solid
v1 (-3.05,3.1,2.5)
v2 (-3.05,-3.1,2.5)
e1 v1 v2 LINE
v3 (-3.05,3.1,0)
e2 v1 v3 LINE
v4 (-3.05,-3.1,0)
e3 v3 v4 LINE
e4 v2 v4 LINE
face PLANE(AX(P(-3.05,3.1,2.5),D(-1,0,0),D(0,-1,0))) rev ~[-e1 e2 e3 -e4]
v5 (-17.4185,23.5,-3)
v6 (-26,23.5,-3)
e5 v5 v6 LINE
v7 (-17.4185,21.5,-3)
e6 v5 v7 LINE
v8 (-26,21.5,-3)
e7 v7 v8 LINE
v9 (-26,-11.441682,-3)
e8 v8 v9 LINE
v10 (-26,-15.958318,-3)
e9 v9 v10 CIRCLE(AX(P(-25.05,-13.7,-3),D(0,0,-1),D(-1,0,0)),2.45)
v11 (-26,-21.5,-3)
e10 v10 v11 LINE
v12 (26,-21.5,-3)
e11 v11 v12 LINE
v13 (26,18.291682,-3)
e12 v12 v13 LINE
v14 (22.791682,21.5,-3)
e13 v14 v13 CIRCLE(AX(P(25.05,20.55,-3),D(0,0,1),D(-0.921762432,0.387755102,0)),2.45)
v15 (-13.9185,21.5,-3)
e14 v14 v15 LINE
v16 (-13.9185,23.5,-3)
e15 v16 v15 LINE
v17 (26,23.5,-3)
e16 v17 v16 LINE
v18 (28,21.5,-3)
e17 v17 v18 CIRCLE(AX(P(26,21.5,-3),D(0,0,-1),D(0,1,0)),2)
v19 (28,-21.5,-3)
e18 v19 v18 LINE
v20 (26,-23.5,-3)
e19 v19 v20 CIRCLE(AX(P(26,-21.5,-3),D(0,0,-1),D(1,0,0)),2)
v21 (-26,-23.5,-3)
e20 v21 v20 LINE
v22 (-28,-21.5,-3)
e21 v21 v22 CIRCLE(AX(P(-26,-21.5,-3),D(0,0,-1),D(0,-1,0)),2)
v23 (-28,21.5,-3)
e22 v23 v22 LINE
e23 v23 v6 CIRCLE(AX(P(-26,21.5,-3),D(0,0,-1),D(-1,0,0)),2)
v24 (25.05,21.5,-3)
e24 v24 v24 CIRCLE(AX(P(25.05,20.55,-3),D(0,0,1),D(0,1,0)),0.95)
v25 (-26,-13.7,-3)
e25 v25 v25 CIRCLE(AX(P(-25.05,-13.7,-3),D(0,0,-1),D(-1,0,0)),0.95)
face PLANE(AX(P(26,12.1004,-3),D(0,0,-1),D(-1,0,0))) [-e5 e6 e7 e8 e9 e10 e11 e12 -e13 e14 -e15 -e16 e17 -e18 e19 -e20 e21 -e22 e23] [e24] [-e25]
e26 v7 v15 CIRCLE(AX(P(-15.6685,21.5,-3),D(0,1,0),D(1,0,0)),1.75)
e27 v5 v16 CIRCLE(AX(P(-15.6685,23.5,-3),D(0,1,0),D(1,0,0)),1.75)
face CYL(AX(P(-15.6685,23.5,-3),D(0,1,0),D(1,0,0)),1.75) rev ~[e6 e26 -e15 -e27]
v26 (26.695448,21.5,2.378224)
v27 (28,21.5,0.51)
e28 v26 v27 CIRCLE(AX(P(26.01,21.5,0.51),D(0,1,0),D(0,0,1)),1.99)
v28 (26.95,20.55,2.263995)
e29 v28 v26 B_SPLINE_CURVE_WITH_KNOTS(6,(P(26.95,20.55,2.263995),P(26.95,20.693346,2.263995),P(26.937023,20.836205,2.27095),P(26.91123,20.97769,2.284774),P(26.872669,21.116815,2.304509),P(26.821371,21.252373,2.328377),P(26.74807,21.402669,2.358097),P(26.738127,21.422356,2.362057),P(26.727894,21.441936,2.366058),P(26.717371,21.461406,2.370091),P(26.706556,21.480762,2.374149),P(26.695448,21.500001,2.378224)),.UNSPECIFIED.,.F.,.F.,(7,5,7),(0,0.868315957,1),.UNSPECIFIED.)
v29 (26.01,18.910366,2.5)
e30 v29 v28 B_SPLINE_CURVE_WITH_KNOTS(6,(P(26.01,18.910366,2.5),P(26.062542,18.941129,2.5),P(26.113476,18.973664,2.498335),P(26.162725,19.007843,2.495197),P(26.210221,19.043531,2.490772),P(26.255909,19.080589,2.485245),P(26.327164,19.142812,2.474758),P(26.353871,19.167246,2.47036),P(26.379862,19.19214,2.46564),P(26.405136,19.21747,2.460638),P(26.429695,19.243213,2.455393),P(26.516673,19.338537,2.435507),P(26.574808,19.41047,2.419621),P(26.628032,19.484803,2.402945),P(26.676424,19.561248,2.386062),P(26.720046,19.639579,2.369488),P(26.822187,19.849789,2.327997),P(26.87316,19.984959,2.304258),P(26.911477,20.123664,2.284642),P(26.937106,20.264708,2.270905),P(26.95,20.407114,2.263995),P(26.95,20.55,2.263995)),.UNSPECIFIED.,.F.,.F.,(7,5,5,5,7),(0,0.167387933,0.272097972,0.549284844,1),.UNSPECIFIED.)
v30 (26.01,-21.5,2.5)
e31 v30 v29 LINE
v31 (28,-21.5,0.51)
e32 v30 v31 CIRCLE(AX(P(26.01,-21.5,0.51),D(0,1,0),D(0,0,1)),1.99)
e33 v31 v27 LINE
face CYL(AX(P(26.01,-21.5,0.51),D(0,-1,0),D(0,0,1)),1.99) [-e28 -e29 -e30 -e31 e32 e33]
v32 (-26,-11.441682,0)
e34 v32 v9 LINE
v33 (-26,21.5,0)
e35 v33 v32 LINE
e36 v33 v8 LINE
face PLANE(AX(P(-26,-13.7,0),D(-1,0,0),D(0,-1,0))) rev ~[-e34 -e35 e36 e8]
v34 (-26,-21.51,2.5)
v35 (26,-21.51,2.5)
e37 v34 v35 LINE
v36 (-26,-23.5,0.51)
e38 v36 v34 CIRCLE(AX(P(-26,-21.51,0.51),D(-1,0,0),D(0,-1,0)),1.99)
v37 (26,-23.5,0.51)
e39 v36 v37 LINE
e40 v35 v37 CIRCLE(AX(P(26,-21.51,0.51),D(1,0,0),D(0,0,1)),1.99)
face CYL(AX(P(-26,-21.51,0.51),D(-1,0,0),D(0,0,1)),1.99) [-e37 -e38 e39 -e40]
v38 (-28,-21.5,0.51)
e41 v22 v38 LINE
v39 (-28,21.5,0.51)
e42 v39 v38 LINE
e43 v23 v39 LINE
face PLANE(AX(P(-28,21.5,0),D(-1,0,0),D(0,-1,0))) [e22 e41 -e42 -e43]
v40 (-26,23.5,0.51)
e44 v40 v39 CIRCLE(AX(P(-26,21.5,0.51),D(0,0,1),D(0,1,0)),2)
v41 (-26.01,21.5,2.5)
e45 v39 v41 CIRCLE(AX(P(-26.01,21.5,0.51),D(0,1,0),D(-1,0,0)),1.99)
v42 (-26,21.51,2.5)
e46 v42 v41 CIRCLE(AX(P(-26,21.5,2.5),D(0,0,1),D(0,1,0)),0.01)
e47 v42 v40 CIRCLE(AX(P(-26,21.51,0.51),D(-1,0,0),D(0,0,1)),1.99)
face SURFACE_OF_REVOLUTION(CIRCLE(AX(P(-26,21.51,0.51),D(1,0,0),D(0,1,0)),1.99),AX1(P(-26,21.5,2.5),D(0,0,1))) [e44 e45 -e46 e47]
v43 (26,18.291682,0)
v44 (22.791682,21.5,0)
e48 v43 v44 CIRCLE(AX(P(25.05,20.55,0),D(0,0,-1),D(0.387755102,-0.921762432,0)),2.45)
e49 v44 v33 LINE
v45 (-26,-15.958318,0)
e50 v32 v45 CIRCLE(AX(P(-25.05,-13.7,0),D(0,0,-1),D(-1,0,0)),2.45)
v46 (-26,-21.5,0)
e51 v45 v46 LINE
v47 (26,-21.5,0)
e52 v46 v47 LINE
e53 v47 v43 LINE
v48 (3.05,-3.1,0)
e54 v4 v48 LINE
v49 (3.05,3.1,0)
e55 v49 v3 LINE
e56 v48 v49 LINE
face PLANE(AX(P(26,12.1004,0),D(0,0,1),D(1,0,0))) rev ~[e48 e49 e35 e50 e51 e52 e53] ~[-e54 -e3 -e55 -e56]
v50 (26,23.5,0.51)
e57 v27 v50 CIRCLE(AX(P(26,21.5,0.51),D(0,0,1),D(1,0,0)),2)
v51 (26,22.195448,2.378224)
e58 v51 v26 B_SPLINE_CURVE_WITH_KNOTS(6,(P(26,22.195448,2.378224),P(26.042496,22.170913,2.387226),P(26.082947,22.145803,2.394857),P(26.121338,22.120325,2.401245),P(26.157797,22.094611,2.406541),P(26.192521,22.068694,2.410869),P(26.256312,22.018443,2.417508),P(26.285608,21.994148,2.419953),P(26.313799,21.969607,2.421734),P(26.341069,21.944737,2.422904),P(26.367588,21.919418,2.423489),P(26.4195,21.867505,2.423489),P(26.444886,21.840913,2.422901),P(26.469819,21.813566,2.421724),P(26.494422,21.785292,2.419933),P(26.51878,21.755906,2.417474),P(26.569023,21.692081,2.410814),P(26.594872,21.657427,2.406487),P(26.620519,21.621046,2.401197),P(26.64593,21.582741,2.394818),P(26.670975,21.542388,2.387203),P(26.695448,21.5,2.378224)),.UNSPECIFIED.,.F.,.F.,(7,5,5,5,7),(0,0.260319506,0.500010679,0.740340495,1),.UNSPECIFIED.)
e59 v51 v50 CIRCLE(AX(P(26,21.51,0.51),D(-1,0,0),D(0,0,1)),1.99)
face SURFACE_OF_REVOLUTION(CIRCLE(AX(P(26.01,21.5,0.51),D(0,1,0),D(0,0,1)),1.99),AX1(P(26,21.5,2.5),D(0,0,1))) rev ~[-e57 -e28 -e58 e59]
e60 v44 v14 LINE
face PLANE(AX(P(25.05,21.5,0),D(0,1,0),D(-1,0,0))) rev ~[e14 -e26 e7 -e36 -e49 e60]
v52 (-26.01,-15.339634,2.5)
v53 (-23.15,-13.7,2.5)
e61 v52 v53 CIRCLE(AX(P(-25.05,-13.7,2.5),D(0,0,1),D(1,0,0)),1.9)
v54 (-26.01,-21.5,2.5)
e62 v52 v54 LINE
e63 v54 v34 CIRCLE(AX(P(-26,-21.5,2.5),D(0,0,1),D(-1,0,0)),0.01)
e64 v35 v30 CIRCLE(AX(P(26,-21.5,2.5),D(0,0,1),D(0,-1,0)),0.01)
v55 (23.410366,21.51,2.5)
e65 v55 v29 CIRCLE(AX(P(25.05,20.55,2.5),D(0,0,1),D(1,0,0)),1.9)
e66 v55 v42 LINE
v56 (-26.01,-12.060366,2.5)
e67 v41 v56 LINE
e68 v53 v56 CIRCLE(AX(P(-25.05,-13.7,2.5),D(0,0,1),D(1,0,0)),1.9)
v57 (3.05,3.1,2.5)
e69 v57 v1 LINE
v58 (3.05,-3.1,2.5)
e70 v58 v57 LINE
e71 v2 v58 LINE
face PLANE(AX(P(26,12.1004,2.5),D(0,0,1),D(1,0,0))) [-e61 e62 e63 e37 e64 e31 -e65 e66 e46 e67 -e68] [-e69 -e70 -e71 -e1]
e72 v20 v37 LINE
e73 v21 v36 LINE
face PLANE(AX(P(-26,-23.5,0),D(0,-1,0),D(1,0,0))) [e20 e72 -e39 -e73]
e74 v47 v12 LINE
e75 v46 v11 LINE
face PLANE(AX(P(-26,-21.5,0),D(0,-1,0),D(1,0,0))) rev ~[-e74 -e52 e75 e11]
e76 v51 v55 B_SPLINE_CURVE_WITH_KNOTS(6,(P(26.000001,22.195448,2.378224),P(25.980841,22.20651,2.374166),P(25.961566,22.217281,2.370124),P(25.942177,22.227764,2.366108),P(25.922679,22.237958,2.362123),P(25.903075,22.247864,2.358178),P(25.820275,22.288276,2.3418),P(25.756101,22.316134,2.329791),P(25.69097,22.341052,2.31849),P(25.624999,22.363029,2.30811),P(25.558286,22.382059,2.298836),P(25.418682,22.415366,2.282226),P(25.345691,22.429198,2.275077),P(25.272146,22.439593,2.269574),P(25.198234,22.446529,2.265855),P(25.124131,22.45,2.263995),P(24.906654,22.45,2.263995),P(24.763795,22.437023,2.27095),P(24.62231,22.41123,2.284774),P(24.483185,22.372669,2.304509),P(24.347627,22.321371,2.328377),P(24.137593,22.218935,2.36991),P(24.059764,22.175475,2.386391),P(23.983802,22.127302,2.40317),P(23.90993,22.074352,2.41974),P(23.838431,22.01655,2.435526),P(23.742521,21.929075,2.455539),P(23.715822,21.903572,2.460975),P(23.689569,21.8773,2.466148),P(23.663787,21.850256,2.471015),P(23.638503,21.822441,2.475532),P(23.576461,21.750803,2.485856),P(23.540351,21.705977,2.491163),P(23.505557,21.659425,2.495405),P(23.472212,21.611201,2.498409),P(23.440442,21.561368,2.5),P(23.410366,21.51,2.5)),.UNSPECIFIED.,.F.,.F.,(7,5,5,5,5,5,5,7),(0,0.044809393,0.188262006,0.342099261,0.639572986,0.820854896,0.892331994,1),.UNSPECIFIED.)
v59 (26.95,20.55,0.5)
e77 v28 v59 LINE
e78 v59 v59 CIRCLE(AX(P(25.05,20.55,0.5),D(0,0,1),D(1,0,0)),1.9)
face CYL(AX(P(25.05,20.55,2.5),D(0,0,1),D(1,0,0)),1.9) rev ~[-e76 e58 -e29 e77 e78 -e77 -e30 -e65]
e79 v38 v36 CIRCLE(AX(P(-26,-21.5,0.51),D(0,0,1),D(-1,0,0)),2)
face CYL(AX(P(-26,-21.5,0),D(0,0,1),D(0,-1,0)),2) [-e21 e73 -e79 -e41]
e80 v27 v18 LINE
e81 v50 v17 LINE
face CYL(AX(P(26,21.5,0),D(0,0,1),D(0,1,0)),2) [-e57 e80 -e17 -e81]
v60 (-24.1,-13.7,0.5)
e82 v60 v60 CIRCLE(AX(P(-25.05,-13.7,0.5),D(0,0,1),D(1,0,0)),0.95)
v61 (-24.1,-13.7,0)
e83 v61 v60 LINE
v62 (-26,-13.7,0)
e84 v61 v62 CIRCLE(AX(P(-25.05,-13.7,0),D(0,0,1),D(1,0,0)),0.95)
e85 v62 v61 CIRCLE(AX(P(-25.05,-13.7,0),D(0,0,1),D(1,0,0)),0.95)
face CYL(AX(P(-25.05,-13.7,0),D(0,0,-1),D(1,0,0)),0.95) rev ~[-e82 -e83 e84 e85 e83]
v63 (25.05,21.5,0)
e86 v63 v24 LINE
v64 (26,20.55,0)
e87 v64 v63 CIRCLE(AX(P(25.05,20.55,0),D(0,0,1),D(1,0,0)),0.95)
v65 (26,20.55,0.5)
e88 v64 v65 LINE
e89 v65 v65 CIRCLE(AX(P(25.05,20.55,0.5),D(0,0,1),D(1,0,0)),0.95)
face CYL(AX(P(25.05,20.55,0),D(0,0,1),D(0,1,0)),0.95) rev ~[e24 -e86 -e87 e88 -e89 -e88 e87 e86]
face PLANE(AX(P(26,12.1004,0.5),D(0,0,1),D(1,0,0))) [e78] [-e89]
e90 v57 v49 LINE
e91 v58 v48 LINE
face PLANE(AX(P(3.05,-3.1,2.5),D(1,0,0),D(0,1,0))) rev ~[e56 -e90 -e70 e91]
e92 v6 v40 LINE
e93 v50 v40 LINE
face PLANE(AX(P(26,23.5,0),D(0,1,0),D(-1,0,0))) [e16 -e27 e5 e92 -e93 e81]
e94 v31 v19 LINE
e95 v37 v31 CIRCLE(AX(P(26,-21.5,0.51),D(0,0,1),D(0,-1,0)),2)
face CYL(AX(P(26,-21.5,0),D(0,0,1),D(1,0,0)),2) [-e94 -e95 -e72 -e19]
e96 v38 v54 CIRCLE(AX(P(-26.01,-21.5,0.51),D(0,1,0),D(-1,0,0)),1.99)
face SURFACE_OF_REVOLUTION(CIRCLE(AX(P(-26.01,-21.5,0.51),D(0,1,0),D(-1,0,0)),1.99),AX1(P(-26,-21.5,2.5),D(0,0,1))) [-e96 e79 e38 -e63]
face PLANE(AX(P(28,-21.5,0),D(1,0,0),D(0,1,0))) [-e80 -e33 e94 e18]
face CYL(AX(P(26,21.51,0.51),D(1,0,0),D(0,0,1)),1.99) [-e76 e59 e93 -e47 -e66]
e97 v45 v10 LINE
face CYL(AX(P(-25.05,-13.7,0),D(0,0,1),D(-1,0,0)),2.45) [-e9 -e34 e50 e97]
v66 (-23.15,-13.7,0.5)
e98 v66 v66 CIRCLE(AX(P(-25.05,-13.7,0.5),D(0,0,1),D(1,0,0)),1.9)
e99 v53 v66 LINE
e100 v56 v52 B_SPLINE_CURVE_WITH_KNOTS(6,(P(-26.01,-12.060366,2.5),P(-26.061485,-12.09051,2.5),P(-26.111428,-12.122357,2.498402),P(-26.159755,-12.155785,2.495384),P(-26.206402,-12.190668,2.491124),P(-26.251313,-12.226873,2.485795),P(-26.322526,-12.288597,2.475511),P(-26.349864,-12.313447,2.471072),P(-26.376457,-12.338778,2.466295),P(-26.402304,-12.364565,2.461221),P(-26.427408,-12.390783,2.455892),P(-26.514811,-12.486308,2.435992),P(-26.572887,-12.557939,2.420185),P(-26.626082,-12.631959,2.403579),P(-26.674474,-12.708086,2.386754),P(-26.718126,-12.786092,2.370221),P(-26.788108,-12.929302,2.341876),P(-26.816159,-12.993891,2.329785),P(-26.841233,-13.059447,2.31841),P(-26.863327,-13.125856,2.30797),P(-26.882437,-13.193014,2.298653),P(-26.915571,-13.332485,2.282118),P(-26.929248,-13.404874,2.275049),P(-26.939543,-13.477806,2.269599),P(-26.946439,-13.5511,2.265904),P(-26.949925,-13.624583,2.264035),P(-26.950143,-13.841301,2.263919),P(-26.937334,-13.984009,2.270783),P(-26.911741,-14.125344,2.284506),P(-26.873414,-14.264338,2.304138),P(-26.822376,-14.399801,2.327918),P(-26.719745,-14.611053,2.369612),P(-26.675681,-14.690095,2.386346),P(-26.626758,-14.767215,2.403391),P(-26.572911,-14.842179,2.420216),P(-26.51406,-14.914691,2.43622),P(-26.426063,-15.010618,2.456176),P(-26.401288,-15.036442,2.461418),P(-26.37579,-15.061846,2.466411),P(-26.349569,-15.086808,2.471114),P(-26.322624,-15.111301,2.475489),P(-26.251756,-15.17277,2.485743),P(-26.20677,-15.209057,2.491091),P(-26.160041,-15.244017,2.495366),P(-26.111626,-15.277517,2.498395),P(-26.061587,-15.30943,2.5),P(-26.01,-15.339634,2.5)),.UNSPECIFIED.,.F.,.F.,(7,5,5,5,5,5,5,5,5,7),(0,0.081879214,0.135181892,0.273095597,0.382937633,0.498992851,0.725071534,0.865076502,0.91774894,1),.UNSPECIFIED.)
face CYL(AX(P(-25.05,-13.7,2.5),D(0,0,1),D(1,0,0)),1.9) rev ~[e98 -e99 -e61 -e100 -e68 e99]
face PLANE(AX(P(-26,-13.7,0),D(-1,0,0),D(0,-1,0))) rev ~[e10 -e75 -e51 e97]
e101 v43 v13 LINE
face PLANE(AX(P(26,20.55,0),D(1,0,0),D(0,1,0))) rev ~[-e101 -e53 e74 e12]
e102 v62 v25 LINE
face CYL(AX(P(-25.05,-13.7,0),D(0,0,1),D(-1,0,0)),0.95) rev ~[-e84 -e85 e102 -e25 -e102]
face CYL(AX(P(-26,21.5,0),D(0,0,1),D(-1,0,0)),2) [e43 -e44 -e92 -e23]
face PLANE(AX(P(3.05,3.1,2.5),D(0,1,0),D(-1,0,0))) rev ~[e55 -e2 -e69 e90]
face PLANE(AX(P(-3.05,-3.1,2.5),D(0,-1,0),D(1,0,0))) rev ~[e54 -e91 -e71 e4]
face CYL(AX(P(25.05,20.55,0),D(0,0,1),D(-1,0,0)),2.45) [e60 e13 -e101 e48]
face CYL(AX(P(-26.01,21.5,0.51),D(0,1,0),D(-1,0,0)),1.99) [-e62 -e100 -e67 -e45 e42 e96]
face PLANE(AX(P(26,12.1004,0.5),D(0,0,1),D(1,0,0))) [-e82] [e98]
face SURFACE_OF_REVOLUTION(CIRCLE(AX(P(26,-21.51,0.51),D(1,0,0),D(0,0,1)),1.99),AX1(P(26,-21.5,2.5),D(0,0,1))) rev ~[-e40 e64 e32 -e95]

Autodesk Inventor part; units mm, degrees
ref_plane "YZ Plane" through (0, 0, 0) normal (1, 0, 0) x (0, 1, 0)
ref_plane "XZ Plane" through (0, 0, 0) normal (0, 1, 0) x (-1, 0, 0)
ref_plane "Arbeitsebene1" through (26, 12.1004, 0) normal (0, 0, 1) x (1, 0, 0)
sketch "Skizze1" plane through (26, 12.1004, 0) normal (0, 0, 1) x (1, 0, 0)
  arc A0 (-54, -33.6004) -> (-52, -35.6004) centre (-52, -33.6004) ccw projected
  line L0 (-52, -35.6004) -> (0, -35.6004) projected
  arc A1 (0, -35.6004) -> (2, -33.6004) centre (0, -33.6004) ccw projected
  line L1 (2, -33.6004) -> (2, 9.3996) projected
  arc A2 (2, 9.3996) -> (0, 11.3996) centre (0, 9.3996) ccw projected
  line L2 (0, 11.3996) -> (-52, 11.3996) projected
  arc A3 (-52, 11.3996) -> (-54, 9.3996) centre (-52, 9.3996) ccw projected
  line L3 (-54, 9.3996) -> (-54, -33.6004) projected
  circle A4 centre (-0.95, 8.4496) radius 0.95 projected
  circle A5 centre (-51.05, -25.8004) radius 0.95 projected
  arc A6 (-24.2441, 3.8663) -> (-23.5, 4.8331) centre (-24.5, 4.8331) ccw projected
  line L4 (-23.5, 5.8996) -> (-23.5, 4.8331) projected
  line L5 (-24.5, 5.8996) -> (-23.5, 5.8996) projected
  line L6 (-24.5, 9.3996) -> (-24.5, 5.8996) projected
  line L7 (-24.5, 9.3996) -> (-7.5, 9.3996) projected
  line L8 (-7.5, 5.8996) -> (-7.5, 9.3996) projected
  line L9 (-8.5, 5.8996) -> (-7.5, 5.8996) projected
  line L10 (-8.5, 4.8996) -> (-8.5, 5.8996) projected
  arc A7 (-8.5, 4.8996) -> (-7.5, 3.8996) centre (-7.5, 4.8996) ccw projected
  line L11 (-7, 3.8996) -> (-7.5, 3.8996) projected
  arc A8 (-7, 3.8996) -> (-6, 4.8996) centre (-7, 4.8996) ccw projected
  line L12 (-6, 9.3996) -> (-6, 4.8996) projected
  line L13 (-6, 9.3996) -> (-4.3996, 9.3996) projected
  arc A9 (-3.3997, 8.4141) -> (-4.3996, 9.3996) centre (-4.3996, 8.3996) ccw projected
  arc A10 (-3.3997, 8.4141) -> (-0.9855, 5.9999) centre (-0.95, 8.4496) ccw projected
  arc A11 (0, 5) -> (-0.9855, 5.9999) centre (-1, 5) ccw projected
  line L14 (0, 5) -> (0, -25.7504) projected
  arc A12 (-0.5, -26.6164) -> (0, -25.7504) centre (-1, -25.7504) ccw projected
  arc A13 (-0.5, -26.6164) -> (-1, -27.4824) centre (0, -27.4824) ccw projected
  line L15 (-1, -28.7504) -> (-1, -27.4824) projected
  line L16 (0, -28.7504) -> (-1, -28.7504) projected
  line L17 (0, -28.7504) -> (0, -33.6004) projected
  line L18 (0, -33.6004) -> (-52, -33.6004) projected
  line L19 (-52, -33.6004) -> (-52, -28.7504) projected
  line L20 (-51, -28.7504) -> (-52, -28.7504) projected
  line L21 (-51, -28.6986) -> (-51, -28.7504) projected
  arc A14 (-50.5932, -28.2074) -> (-51, -28.6986) centre (-50.5, -28.6986) ccw projected
  arc A15 (-50.5932, -28.2074) -> (-51.0145, -23.3506) centre (-51.05, -25.8004) ccw projected
  arc A16 (-52, -22.3507) -> (-51.0145, -23.3506) centre (-51, -22.3507) ccw projected
  line L22 (-52, -22.3507) -> (-52, 2.2996) projected
  arc A17 (-51.5, 3.1657) -> (-52, 2.2996) centre (-51, 2.2996) ccw projected
  arc A18 (-51.5, 3.1657) -> (-51, 4.0317) centre (-52, 4.0317) ccw projected
  line L23 (-51, 5.2996) -> (-51, 4.0317) projected
  line L24 (-52, 5.2996) -> (-51, 5.2996) projected
  line L25 (-52, 5.2996) -> (-52, 9.3996) projected
  line L26 (-52, 9.3996) -> (-26, 9.3996) projected
  line L27 (-26, 5.2996) -> (-26, 9.3996) projected
  line L28 (-27, 5.2996) -> (-26, 5.2996) projected
  line L29 (-27, 4.2996) -> (-27, 5.2996) projected
  arc A19 (-27, 4.2996) -> (-26, 3.2996) centre (-26, 4.2996) ccw projected
  line L30 (-25.4165, 3.2996) -> (-26, 3.2996) projected
  arc A20 (-25.4165, 3.2996) -> (-24.7024, 3.5996) centre (-25.4165, 4.2996) ccw projected
  arc A21 (-24.2441, 3.8663) -> (-24.7024, 3.5996) centre (-23.9882, 2.8996) ccw projected
  point P0 (-26, -12.1004)
extrude "Extrusion1" add sketch "Skizze1" along normal blind 2.5 contours L3 A3 L2 A2 L1 A1 L0 A0 | A6 L4 L5 L6 L7 L8 L9 L10 A7 L11 A8 L12 L13 A9 A10 A11 L14 A12 A13 L15 L16 L17 L18 L19 L20 L21 A14 A15 A16 L22 A17 A18 L23 L24 L25 L26 L27 L28 L29 A19 L30 A20 A21
sketch "Skizze2" plane through (26, 12.1004, 2.5) normal (0, 0, 1) x (1, 0, 0)
  circle A0 centre (-0.95, 8.4496) radius 0.95 projected
  circle A1 centre (-51.05, -25.8004) radius 0.95 projected
  circle A2 centre (-51.05, -25.8004) radius 1.9
  circle A3 centre (-0.95, 8.4496) radius 1.9
  point P0 (-26, -12.1004)
  dimension "d2" = 3.8
  dimension "d3" = 3.8
extrude "Extrusion2" cut sketch "Skizze2" against normal blind 2
fillet "Rundung1" radius 1.99 8 edges at (27.4142, 22.9142, 2.5) (0, 23.5, 2.5) (-27.4142, 22.9142, 2.5) (-28, 0, 2.5) (-27.4142, -22.9142, 2.5) (0, -23.5, 2.5) (27.4142, -22.9142, 2.5) (28, 0, 2.5)
sketch "Skizze3" plane through (26, 12.1004, 2.5) normal (0, 0, 1) x (1, 0, 0)
  line L0 (-22.95, -9.0004) -> (-29.05, -9.0004)
  line L1 (-29.05, -9.0004) -> (-29.05, -15.2004)
  line L2 (-29.05, -15.2004) -> (-22.95, -15.2004)
  line L3 (-22.95, -15.2004) -> (-22.95, -9.0004)
  line L4 (-22.95, -9.0004) -> (-29.05, -15.2004) construction
  line L5 (-29.05, -9.0004) -> (-22.95, -15.2004) construction
  point P0 (-26, -12.1004)
  dimension "d7" = 6.1
  dimension "d8" = 6.2
extrude "Extrusion3" cut sketch "Skizze3" against normal through all
sketch "Skizze5" plane through (26, 12.1004, 0) normal (0, 0, -1) x (-1, 0, 0)
  line L0 (0, 9.3996) -> (52, 9.3996)
  line L1 (52, 9.3996) -> (52, -33.6004)
  line L2 (52, -33.6004) -> (0, -33.6004)
  line L3 (0, -33.6004) -> (0, 9.3996)
  line L4 (0, 11.3996) -> (52, 11.3996) projected
  line L5 (52, -35.6004) -> (0, -35.6004) projected
  line L6 (54, 9.3996) -> (54, -33.6004) projected
  line L7 (-2, -33.6004) -> (-2, 9.3996) projected
  line L8 (29.05, -15.2004) -> (22.95, -15.2004) projected
  line L9 (22.95, -15.2004) -> (22.95, -9.0004) projected
  line L10 (22.95, -9.0004) -> (29.05, -9.0004) projected
  line L11 (29.05, -9.0004) -> (29.05, -15.2004) projected
  line L12 (52, -35.6004) -> (0, -35.6004) projected
  arc A0 (52, -35.6004) -> (54, -33.6004) centre (52, -33.6004) ccw projected
  line L13 (54, 9.3996) -> (54, -33.6004) projected
  arc A1 (54, 9.3996) -> (52, 11.3996) centre (52, 9.3996) ccw projected
  line L14 (0, 11.3996) -> (52, 11.3996) projected
  arc A2 (0, 11.3996) -> (-2, 9.3996) centre (0, 9.3996) ccw projected
  line L15 (-2, -33.6004) -> (-2, 9.3996) projected
  arc A3 (-2, -33.6004) -> (0, -35.6004) centre (0, -33.6004) ccw projected
  circle A4 centre (0.95, 8.4496) radius 0.95 projected
  circle A5 centre (51.05, -25.8004) radius 0.95 projected
  point P0 (26, -12.1004)
  point P1 (54, -33.6004)
  point P2 (54, 9.3996)
  point P3 (52, 11.3996)
  point P4 (0, 11.3996)
  point P5 (-2, 9.3996)
  point P6 (-2, -33.6004)
  point P7 (0, -35.6004)
  dimension "d11" = 2
  dimension "d12" = 2
  dimension "d13" = 2
  dimension "d14" = 2
extrude "Extrusion4" add sketch "Skizze5" along normal blind 3 contours L4 A1 L6 A0 L5 A3 L7 A2
sketch "Skizze6" plane through (-26, 23.5, 0.51) normal (0, 1, 0) x (1, 0, 0)
  line L0 (52, 3.51) -> (0, 3.51) projected
  circle A0 centre (10.3315, 3.51) radius 1.75
  point P0 (26, 0.51)
  point P1 (8.5815, 3.51)
  point P2 (12.0815, 3.51)
  dimension "d17" = 3.5
extrude "Extrusion5" cut sketch "Skizze6" against normal blind 3 contours A0 L0 picked at (10.0001, 3.0299)
sketch "Skizze7" plane through (26, 12.1004, 0) normal (0, 0, -1) x (-1, 0, 0)
  line L0 (29.05, -15.2004) -> (22.95, -15.2004) projected
  line L1 (22.95, -15.2004) -> (22.95, -9.0004) projected
  line L2 (22.95, -9.0004) -> (29.05, -9.0004) projected
  line L3 (29.05, -9.0004) -> (29.05, -15.2004) projected
  line L4 (52, 9.3996) -> (0.95, 9.3996) projected
  arc A0 (0, 8.4496) -> (0.95, 9.3996) centre (0.95, 8.4496) ccw projected
  line L5 (0, 8.4496) -> (0, -33.6004) projected
  line L6 (0, -33.6004) -> (52, -33.6004) projected
  line L7 (52, -33.6004) -> (52, -25.8004) projected
  circle A1 centre (51.05, -25.8004) radius 0.95 projected
  line L8 (52, -25.8004) -> (52, 9.3996) projected
  circle A2 centre (51.05, -25.8004) radius 2.45
  circle A3 centre (0.95, 8.4496) radius 2.45
  line L9 (39.9185, 9.3996) -> (39.9185, 11.3996) projected
  line L10 (39.9185, 11.3996) -> (0, 11.3996) projected
  arc A4 (0, 11.3996) -> (-2, 9.3996) centre (0, 9.3996) ccw projected
  line L11 (-2, 9.3996) -> (-2, -33.6004) projected
  arc A5 (-2, -33.6004) -> (0, -35.6004) centre (0, -33.6004) ccw projected
  line L12 (0, -35.6004) -> (52, -35.6004) projected
  arc A6 (52, -35.6004) -> (54, -33.6004) centre (52, -33.6004) ccw projected
  line L13 (54, -33.6004) -> (54, 9.3996) projected
  arc A7 (54, 9.3996) -> (52, 11.3996) centre (52, 9.3996) ccw projected
  line L14 (52, 11.3996) -> (43.4185, 11.3996) projected
  line L15 (43.4185, 11.3996) -> (43.4185, 9.3996) projected
  line L16 (43.4185, 9.3996) -> (52, 9.3996) projected
  line L17 (52, 9.3996) -> (52, -33.6004) projected
  line L18 (52, -33.6004) -> (0, -33.6004) projected
  line L19 (0, -33.6004) -> (0, 9.3996) projected
  line L20 (0, 9.3996) -> (39.9185, 9.3996) projected
  arc A8 (0.95, 9.3996) -> (0, 8.4496) centre (0.95, 8.4496) ccw projected
  point P0 (26, -12.1004)
  point P1 (52, -23.542)
  point P2 (52, -28.0587)
  point P3 (0.95, 9.3996)
  point P4 (0.95, 9.3996)
  point P5 (0.95, 9.3996)
  point P6 (3.2083, 9.3996)
  point P7 (0, 6.1913)
  dimension "d20" = 1.5
  dimension "d21" = 1.5
extrude "Extrusion6" add sketch "Skizze7" along normal blind 3 contours L8 L7 A2 | A3 L5 A0 L4 | A8 L19 L20 picked at (49.1338, -25.5256)
properties part number "Lid"
